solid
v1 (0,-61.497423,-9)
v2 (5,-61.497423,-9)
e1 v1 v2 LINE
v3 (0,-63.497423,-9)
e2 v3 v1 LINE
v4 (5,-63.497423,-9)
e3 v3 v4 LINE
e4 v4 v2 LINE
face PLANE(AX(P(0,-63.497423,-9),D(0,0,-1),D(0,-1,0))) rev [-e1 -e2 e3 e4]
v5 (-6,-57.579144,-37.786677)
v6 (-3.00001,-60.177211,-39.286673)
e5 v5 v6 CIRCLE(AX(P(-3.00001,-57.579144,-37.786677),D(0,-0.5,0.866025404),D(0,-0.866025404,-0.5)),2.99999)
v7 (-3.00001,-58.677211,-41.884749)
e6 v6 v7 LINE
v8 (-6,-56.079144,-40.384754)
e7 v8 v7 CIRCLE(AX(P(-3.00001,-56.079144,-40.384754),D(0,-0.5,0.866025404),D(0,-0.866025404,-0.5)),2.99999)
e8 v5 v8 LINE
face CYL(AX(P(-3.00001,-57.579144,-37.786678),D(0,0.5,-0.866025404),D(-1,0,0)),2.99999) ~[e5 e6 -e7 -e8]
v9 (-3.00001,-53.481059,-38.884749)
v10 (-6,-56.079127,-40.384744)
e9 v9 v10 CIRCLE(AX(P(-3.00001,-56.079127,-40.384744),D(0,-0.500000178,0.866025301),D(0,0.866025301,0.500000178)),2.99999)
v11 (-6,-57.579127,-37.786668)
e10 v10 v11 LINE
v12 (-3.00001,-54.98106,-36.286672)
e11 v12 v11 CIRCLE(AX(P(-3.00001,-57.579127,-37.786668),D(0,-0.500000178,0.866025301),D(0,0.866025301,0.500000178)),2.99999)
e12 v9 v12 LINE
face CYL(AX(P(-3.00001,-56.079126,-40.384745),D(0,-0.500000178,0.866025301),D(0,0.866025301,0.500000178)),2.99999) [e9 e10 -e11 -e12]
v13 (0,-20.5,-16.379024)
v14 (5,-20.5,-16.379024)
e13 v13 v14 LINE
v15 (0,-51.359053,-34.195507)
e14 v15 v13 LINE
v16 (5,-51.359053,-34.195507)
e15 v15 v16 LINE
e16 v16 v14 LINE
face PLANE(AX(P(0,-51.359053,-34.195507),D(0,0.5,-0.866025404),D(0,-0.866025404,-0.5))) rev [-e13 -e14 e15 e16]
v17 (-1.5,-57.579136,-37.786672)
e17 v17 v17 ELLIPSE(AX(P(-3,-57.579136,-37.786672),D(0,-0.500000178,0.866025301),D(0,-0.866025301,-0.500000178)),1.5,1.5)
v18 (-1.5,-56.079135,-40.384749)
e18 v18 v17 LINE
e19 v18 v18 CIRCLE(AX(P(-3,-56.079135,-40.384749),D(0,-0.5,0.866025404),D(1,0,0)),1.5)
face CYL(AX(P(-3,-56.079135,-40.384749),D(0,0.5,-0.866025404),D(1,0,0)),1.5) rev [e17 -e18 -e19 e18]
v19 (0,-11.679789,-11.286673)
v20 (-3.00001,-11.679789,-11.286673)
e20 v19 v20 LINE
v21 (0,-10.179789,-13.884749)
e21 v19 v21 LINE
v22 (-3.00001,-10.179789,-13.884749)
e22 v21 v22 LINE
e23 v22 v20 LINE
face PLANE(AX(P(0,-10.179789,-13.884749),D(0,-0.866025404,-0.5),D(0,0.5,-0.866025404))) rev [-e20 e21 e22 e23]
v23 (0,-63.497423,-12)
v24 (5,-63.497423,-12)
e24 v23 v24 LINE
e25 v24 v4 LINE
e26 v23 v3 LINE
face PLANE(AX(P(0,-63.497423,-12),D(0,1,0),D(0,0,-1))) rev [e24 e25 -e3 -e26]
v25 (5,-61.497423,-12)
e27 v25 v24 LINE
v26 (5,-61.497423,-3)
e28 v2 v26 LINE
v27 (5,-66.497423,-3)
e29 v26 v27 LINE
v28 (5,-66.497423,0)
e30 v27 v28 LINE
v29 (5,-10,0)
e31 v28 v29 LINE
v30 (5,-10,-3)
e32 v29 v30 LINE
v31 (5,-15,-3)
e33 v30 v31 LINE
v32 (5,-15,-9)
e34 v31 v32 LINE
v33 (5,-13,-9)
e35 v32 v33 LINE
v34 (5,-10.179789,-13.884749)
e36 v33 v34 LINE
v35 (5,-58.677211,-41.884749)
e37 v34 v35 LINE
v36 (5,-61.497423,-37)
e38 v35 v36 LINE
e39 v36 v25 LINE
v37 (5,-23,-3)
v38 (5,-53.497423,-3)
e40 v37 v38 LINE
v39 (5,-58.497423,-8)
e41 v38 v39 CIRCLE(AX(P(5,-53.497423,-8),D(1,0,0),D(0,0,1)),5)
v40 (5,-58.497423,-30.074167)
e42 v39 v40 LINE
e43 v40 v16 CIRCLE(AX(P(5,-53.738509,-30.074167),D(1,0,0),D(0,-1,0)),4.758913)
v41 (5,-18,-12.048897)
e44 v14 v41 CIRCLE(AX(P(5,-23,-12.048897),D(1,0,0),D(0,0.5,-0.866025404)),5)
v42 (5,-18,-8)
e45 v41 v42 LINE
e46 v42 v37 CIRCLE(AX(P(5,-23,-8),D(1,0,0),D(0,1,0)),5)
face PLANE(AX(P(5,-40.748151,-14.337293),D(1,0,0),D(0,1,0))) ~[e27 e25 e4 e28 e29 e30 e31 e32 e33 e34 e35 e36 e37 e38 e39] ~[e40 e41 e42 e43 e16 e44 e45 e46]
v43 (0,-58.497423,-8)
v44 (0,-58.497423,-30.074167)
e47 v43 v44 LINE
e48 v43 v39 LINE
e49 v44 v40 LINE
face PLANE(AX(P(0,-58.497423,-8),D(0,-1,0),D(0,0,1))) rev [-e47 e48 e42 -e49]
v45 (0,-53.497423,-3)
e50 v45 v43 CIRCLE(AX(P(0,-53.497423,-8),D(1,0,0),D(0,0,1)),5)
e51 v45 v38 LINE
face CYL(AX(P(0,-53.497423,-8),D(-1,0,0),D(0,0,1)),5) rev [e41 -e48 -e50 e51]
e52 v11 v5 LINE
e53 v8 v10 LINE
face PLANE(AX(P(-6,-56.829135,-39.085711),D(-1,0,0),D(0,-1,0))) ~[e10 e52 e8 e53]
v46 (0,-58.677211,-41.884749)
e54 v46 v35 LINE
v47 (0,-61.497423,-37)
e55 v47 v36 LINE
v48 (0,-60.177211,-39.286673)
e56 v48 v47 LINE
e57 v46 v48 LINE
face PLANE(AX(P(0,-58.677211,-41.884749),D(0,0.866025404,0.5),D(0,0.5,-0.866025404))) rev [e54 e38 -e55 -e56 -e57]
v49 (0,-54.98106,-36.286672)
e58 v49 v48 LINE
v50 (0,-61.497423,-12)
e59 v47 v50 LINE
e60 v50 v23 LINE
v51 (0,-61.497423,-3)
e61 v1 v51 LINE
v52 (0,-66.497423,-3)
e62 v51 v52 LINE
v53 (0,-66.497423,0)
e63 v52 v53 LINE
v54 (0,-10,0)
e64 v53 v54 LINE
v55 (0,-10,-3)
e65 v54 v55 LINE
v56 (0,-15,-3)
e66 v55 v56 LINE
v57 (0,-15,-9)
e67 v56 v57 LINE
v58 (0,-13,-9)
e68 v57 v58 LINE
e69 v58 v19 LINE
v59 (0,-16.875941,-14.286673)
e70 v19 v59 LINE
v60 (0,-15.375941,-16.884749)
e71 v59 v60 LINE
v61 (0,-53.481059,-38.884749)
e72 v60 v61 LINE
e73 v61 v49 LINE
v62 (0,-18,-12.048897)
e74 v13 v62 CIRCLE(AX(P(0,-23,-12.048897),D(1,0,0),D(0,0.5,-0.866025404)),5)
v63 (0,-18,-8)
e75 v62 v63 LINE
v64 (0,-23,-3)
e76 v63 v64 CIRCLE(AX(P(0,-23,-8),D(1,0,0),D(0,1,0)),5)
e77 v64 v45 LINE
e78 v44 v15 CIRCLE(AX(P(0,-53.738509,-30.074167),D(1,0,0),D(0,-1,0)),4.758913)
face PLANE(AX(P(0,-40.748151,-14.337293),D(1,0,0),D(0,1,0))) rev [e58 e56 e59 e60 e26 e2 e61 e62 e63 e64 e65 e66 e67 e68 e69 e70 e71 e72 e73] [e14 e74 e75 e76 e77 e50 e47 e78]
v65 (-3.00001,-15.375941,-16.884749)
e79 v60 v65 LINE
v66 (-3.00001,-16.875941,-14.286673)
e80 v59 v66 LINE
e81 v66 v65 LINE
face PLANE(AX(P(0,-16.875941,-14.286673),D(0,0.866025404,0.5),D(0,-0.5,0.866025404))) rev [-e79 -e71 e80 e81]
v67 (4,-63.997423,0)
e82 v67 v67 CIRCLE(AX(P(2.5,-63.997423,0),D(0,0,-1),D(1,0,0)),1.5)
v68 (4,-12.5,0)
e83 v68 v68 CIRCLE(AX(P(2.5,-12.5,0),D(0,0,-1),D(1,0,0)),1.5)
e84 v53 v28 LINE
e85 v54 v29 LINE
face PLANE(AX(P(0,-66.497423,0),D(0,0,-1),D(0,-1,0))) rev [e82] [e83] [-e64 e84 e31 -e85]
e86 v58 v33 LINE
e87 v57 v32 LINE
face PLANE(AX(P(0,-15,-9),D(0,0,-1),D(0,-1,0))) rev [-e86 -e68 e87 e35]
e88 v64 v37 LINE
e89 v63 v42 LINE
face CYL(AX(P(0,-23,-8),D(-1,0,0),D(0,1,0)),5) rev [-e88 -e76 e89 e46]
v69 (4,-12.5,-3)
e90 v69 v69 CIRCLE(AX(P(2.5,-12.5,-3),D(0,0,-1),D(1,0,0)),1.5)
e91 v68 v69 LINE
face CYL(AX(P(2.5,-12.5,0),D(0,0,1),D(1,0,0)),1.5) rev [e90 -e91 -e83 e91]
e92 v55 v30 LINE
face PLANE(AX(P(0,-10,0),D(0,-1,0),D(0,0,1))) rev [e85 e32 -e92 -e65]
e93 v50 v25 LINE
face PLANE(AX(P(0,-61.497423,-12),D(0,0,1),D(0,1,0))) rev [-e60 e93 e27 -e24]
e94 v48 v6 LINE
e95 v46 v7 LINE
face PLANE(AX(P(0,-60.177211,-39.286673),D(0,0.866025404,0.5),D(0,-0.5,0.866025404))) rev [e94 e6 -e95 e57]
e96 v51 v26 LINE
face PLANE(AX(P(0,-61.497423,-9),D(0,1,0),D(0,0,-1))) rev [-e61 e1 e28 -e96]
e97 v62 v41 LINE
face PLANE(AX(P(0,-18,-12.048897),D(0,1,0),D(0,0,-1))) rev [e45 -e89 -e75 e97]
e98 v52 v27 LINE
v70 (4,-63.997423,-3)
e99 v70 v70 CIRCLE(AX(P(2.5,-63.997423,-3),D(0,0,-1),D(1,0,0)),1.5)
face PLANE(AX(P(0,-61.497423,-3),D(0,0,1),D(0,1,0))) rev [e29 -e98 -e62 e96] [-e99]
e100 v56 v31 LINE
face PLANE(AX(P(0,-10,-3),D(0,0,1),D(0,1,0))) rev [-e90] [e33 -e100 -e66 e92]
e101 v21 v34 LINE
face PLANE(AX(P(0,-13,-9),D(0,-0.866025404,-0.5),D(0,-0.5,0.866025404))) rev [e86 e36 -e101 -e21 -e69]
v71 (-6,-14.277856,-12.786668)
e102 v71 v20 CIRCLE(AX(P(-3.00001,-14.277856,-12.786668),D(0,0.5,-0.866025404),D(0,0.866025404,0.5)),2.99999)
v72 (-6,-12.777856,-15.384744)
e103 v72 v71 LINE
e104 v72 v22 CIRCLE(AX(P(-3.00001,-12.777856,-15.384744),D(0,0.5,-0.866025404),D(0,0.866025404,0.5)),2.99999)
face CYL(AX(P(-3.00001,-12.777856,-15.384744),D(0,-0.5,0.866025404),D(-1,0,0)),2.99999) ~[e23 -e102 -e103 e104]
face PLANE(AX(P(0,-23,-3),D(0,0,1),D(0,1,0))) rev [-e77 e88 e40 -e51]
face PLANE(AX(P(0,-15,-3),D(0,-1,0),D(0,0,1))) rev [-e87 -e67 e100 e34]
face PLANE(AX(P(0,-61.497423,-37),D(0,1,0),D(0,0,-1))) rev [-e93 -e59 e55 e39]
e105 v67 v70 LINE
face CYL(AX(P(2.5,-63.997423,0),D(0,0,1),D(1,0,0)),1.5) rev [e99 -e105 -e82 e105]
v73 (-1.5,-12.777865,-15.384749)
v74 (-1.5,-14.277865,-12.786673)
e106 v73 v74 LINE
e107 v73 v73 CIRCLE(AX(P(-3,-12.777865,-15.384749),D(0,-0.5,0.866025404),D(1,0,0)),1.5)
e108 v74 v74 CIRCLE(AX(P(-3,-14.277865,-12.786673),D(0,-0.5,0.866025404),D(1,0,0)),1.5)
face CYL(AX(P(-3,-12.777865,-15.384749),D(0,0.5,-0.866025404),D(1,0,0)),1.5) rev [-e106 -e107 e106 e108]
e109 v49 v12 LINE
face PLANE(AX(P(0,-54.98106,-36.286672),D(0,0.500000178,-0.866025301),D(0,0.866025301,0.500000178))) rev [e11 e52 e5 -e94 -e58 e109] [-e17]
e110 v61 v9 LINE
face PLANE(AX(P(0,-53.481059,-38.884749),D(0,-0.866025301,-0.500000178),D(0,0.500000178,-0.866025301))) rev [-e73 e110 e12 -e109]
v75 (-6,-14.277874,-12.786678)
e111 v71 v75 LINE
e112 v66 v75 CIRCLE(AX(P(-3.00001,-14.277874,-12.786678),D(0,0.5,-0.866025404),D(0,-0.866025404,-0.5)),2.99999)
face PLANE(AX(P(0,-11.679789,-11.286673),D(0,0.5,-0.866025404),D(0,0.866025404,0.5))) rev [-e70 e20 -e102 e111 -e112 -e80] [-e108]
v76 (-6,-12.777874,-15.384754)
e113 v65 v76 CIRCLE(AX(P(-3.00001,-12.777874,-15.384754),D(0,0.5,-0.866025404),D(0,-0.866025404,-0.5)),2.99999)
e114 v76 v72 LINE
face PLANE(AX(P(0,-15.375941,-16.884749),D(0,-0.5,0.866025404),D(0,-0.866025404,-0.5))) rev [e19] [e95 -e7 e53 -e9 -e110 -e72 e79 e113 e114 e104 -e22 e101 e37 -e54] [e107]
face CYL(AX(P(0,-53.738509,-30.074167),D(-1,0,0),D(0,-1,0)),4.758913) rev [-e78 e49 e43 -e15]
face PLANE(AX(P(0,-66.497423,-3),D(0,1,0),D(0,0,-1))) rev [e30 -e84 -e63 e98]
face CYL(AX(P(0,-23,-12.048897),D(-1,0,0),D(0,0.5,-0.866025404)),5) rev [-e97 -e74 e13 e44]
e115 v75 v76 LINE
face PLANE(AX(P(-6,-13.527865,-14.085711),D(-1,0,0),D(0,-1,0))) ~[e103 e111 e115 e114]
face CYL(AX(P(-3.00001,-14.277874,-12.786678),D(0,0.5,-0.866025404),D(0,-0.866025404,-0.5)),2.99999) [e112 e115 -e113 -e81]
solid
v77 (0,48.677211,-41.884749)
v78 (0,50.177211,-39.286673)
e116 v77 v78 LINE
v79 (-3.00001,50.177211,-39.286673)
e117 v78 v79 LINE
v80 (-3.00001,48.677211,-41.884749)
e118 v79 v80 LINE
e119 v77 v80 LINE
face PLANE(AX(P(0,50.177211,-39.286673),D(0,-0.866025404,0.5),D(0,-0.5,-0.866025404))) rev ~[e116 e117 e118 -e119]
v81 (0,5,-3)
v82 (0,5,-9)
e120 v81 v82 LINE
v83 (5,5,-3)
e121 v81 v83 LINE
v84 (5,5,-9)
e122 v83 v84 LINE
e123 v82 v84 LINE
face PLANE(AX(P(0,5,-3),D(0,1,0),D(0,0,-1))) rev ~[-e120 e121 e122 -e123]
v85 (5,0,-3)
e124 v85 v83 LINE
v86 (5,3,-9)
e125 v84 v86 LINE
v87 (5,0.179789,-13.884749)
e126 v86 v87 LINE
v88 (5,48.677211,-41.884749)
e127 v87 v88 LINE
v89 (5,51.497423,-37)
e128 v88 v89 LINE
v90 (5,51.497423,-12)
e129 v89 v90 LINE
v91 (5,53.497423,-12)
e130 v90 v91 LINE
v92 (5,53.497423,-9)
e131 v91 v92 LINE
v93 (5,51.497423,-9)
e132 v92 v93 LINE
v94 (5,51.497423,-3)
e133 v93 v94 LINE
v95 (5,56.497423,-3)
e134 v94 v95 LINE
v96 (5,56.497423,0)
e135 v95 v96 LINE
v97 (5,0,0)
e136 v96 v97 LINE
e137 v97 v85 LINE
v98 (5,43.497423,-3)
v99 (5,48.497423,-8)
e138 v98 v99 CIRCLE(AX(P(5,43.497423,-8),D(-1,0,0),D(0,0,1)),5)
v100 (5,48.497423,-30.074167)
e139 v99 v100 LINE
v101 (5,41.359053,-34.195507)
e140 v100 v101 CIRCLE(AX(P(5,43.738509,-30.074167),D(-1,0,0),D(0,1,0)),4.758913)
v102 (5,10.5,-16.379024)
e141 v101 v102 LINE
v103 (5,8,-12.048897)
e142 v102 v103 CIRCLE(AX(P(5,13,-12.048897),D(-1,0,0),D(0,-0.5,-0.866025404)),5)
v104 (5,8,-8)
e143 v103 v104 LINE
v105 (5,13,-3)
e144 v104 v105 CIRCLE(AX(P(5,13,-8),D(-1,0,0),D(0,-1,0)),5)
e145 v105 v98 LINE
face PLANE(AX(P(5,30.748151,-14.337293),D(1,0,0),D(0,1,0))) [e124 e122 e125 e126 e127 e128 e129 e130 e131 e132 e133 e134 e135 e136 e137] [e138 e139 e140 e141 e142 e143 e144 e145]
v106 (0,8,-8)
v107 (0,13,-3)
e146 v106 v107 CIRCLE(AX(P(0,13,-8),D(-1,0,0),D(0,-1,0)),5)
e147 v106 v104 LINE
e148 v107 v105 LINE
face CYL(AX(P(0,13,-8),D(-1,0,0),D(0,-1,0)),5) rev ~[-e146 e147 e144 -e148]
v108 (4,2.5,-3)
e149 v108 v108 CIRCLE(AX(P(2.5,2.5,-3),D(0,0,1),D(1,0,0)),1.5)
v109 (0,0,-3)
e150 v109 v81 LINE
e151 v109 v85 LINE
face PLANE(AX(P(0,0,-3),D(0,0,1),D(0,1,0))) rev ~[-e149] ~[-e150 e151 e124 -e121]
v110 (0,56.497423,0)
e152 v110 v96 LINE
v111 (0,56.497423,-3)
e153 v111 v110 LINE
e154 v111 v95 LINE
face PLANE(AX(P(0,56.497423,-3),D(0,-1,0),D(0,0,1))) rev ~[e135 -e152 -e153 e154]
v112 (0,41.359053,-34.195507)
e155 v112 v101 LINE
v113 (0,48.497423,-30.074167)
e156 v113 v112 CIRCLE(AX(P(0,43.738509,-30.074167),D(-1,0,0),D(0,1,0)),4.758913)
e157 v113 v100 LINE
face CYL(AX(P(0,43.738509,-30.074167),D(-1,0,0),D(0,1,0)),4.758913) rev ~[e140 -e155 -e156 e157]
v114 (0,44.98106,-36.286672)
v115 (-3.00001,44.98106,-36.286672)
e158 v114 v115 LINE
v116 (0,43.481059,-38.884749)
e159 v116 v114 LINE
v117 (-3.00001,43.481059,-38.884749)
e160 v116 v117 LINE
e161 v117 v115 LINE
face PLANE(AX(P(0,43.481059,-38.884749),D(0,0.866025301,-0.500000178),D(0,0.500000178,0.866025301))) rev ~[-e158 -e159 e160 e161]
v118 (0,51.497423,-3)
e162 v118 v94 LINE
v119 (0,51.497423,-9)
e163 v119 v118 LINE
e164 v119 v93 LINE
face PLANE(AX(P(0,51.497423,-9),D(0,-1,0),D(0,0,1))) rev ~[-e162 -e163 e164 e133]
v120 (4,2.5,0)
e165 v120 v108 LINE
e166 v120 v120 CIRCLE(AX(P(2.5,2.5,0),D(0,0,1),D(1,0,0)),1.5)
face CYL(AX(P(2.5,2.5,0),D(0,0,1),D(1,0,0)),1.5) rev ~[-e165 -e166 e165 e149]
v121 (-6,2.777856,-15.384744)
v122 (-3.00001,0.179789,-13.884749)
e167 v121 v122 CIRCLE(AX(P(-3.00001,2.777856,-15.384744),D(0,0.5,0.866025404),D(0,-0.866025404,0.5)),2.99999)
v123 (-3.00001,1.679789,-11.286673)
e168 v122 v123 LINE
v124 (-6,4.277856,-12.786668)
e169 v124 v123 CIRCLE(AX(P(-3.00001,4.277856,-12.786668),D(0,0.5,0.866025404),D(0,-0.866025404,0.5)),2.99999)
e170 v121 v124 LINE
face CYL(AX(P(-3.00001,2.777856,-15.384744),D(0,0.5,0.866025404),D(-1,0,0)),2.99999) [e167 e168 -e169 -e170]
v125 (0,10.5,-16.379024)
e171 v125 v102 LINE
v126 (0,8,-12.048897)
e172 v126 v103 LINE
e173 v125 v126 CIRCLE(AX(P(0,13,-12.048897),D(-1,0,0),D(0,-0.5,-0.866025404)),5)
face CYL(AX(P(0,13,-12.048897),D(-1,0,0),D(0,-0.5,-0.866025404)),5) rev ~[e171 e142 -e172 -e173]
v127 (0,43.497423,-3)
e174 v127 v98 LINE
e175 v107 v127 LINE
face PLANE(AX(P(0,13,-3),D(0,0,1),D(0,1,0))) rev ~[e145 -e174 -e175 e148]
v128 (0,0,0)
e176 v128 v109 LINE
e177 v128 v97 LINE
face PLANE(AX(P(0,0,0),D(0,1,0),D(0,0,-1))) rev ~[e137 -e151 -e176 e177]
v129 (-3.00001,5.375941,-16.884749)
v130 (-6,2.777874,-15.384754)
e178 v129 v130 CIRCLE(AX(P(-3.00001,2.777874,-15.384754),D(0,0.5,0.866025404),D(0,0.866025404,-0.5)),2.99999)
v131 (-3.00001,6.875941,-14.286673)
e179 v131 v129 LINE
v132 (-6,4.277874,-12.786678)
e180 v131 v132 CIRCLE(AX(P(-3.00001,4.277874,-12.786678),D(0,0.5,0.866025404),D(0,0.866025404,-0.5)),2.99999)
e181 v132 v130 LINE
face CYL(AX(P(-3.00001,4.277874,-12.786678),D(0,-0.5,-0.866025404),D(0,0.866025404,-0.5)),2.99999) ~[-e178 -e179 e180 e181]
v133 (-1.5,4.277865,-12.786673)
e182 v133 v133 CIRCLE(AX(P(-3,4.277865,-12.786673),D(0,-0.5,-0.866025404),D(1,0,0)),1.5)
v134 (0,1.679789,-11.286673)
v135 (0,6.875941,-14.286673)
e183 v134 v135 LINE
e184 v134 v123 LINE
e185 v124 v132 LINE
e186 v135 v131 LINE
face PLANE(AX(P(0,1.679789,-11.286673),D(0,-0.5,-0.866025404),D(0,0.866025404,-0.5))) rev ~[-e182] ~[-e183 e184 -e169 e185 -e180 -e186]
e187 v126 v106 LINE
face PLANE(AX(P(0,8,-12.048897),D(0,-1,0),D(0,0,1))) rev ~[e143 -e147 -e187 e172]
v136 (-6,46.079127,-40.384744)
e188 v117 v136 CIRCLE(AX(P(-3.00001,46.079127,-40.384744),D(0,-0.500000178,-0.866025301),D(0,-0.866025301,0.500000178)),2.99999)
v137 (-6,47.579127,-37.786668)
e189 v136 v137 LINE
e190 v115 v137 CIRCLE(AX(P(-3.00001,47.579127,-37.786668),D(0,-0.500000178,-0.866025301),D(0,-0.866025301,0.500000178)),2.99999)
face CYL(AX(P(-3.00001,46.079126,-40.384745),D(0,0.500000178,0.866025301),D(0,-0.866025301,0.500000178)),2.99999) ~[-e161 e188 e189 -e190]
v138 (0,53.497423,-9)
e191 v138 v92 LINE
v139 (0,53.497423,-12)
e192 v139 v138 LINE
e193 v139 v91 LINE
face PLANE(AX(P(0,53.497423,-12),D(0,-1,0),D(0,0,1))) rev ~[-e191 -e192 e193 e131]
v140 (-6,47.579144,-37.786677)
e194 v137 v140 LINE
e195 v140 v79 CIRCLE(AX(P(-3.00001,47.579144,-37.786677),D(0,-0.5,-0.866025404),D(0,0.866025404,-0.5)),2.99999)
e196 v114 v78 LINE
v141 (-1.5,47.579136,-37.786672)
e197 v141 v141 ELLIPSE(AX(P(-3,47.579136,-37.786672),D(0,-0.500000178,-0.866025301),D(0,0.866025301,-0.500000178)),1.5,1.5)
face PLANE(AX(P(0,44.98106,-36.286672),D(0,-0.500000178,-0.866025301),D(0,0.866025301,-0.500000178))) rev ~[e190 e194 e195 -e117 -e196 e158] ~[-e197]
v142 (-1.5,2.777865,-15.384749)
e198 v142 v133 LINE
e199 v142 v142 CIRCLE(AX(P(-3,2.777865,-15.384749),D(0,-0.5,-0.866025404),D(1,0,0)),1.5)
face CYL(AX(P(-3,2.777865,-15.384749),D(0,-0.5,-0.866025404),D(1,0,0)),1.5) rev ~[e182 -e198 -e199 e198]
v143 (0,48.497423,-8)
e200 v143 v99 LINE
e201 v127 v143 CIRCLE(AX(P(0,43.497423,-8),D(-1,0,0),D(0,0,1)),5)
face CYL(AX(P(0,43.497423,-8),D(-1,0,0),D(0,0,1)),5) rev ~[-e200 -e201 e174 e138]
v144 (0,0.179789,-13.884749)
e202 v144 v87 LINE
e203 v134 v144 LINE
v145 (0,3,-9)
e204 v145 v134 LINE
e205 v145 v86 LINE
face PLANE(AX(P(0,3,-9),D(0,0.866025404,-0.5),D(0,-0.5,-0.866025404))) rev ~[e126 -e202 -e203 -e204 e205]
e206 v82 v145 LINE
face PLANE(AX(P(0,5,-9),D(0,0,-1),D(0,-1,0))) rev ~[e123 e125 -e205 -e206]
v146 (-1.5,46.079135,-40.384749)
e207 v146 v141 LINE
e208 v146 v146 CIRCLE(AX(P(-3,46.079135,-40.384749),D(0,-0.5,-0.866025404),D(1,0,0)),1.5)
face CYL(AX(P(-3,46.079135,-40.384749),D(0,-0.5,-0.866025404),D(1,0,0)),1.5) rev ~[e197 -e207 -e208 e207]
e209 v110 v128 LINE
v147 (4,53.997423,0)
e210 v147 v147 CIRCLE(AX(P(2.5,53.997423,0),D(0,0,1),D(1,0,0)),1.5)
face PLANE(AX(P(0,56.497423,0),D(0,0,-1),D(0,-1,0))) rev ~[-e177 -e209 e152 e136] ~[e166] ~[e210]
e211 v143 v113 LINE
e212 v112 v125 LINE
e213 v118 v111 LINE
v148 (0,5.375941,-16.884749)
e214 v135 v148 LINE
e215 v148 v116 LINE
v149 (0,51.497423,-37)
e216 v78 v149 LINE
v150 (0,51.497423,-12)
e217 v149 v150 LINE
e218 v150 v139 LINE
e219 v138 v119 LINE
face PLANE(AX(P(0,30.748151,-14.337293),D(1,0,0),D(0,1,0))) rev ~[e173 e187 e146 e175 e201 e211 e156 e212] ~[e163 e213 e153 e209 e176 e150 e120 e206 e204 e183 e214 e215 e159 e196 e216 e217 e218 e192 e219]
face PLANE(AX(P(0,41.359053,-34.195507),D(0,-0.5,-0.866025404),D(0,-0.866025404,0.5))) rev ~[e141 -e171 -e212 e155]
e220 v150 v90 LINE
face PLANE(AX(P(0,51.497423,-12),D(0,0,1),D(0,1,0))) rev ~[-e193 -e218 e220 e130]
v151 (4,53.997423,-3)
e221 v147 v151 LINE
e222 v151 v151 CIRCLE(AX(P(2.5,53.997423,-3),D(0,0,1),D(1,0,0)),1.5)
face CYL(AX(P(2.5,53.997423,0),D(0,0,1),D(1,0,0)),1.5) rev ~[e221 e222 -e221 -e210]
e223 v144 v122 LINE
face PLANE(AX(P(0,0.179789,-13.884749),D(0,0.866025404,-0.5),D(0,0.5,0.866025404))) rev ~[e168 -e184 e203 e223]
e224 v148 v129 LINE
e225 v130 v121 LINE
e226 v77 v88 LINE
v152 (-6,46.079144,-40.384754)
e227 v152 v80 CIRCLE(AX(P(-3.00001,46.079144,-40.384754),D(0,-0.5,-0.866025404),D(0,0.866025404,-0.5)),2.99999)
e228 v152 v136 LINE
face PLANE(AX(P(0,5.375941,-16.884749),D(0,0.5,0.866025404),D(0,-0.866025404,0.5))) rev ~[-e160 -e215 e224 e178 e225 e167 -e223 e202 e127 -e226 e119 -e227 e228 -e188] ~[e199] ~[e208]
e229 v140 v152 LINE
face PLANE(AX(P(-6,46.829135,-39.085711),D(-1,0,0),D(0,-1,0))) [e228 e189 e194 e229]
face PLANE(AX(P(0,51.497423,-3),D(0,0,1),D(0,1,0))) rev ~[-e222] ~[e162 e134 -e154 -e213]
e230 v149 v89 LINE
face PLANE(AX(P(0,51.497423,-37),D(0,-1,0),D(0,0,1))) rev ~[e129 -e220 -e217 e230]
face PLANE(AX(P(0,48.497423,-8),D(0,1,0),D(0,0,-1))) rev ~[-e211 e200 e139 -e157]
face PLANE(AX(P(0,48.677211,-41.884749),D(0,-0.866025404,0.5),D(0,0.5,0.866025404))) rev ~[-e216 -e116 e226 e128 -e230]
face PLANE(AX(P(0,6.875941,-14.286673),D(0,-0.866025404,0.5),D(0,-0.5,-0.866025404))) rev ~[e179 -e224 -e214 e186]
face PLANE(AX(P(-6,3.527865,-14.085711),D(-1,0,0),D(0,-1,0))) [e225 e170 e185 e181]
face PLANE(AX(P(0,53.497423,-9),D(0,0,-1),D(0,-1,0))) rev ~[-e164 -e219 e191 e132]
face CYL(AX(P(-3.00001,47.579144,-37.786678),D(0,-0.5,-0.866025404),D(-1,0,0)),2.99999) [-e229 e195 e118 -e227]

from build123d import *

# Parameters (mm, degrees)
F1_DEPTH = 5
F3_DEPTH = 6
F4_R     = 1.5
F5_DEPTH = 3
F6_R     = 1.5
F7_DEPTH = 25
F8_R     = 2.99999


# Not quite as in the source:
# - a fillet or chamfer is up to 0.001 mm smaller than in the source, because OpenCascade refuses the exact size


with BuildPart() as f1:
    # F0 (on Right) → F1 (new body)
    with BuildSketch(Plane.YZ):
        Polygon((15, 0), (0, 0), (0, -3), (5, -3), (5, -9), (3, -9), (0.1797888042, -13.8847490792), (48.6772114161, -41.8847490792), (51.4974226119, -37), (51.4974226119, -12), (53.4974226119, -12), (53.4974226119, -9), (51.4974226119, -9), (51.4974226119, -3), (56.4974226119, -3), (56.4974226119, 0), (48.4974226119, 0), align=None)
        with BuildLine():
            ThreePointArc((48.4974226119, -30.0741666773), (46.1179659481, -34.1955065134), (41.3590526205, -34.1955065134))
            Line((41.3590526205, -34.1955065134), (10.5, -16.3790241761))
            ThreePointArc((10.5, -16.3790241761), (8.6698729811, -14.5488971571), (8, -12.0488971571))
            Line((8, -12.0488971571), (8, -8))
            ThreePointArc((8, -8), (9.4644660941, -4.4644660941), (13, -3))
            Line((13, -3), (20, -3))
            Line((20, -3), (43.4974226119, -3))
            ThreePointArc((43.4974226119, -3), (47.0329565179, -4.4644660941), (48.4974226119, -8))
            Line((48.4974226119, -8), (48.4974226119, -12))
            Line((48.4974226119, -12), (48.4974226119, -30.0741666773))
        make_face(mode=Mode.SUBTRACT)
    extrude(amount=F1_DEPTH)

    # F2 (on face) → F3 (join)
    with BuildSketch(Plane(origin=(0, 0, 0), x_dir=(0, -1, 0), z_dir=(-1, 0, 0))):
        Polygon((-6.8759412269, -14.2866728679), (-5.3759412269, -16.8847490792), (-0.1797888042, -13.8847490792), (-1.6797888042, -11.2866728679), align=None)
        Polygon((-50.1772114161, -39.2866728679), (-48.6772114161, -41.8847490792), (-43.4810589934, -38.8847490792), (-44.981060144, -36.2866721082), align=None)
    extrude(amount=F3_DEPTH)

    # F4 (on face) → F5 (cut, through all)
    with BuildSketch(Plane.XY):
        with Locations((2.5, 2.5)):
            Circle(F4_R)
        with Locations((2.5, 53.9974226119)):
            Circle(F4_R)
    extrude(amount=-F5_DEPTH, mode=Mode.SUBTRACT)

    # F6 (on face) → F7 (cut)
    with BuildSketch(Plane(origin=(0, -5.9673255128, -10.3357109735), x_dir=(1, 0, 0), z_dir=(0, -0.5, -0.8660254038))):
        with Locations((-3, -10.0980762114)):
            Circle(F6_R)
        with Locations((-3, -60.0980762114)):
            Circle(F6_R)
    extrude(amount=-F7_DEPTH, mode=Mode.SUBTRACT)

    # F8 (radius 3 in the source; OpenCascade refuses exactly that, so slightly less here)
    f8_edges = [f1.edges().sort_by_distance(p)[0] for p in [
        (-6, 0.929789, -12.585711),
        (-6, 6.125941, -15.585711),
        (-6, 44.23106, -37.585711),
        (-6, 49.427211, -40.585711),
    ]]
    fillet(f8_edges, radius=F8_R)


with BuildPart() as f10_1:
    # F10: instance of F1
    add(f1.part.mirror(Plane.XZ.offset(5)))


solid = Compound([f1.part, f10_1.part])
